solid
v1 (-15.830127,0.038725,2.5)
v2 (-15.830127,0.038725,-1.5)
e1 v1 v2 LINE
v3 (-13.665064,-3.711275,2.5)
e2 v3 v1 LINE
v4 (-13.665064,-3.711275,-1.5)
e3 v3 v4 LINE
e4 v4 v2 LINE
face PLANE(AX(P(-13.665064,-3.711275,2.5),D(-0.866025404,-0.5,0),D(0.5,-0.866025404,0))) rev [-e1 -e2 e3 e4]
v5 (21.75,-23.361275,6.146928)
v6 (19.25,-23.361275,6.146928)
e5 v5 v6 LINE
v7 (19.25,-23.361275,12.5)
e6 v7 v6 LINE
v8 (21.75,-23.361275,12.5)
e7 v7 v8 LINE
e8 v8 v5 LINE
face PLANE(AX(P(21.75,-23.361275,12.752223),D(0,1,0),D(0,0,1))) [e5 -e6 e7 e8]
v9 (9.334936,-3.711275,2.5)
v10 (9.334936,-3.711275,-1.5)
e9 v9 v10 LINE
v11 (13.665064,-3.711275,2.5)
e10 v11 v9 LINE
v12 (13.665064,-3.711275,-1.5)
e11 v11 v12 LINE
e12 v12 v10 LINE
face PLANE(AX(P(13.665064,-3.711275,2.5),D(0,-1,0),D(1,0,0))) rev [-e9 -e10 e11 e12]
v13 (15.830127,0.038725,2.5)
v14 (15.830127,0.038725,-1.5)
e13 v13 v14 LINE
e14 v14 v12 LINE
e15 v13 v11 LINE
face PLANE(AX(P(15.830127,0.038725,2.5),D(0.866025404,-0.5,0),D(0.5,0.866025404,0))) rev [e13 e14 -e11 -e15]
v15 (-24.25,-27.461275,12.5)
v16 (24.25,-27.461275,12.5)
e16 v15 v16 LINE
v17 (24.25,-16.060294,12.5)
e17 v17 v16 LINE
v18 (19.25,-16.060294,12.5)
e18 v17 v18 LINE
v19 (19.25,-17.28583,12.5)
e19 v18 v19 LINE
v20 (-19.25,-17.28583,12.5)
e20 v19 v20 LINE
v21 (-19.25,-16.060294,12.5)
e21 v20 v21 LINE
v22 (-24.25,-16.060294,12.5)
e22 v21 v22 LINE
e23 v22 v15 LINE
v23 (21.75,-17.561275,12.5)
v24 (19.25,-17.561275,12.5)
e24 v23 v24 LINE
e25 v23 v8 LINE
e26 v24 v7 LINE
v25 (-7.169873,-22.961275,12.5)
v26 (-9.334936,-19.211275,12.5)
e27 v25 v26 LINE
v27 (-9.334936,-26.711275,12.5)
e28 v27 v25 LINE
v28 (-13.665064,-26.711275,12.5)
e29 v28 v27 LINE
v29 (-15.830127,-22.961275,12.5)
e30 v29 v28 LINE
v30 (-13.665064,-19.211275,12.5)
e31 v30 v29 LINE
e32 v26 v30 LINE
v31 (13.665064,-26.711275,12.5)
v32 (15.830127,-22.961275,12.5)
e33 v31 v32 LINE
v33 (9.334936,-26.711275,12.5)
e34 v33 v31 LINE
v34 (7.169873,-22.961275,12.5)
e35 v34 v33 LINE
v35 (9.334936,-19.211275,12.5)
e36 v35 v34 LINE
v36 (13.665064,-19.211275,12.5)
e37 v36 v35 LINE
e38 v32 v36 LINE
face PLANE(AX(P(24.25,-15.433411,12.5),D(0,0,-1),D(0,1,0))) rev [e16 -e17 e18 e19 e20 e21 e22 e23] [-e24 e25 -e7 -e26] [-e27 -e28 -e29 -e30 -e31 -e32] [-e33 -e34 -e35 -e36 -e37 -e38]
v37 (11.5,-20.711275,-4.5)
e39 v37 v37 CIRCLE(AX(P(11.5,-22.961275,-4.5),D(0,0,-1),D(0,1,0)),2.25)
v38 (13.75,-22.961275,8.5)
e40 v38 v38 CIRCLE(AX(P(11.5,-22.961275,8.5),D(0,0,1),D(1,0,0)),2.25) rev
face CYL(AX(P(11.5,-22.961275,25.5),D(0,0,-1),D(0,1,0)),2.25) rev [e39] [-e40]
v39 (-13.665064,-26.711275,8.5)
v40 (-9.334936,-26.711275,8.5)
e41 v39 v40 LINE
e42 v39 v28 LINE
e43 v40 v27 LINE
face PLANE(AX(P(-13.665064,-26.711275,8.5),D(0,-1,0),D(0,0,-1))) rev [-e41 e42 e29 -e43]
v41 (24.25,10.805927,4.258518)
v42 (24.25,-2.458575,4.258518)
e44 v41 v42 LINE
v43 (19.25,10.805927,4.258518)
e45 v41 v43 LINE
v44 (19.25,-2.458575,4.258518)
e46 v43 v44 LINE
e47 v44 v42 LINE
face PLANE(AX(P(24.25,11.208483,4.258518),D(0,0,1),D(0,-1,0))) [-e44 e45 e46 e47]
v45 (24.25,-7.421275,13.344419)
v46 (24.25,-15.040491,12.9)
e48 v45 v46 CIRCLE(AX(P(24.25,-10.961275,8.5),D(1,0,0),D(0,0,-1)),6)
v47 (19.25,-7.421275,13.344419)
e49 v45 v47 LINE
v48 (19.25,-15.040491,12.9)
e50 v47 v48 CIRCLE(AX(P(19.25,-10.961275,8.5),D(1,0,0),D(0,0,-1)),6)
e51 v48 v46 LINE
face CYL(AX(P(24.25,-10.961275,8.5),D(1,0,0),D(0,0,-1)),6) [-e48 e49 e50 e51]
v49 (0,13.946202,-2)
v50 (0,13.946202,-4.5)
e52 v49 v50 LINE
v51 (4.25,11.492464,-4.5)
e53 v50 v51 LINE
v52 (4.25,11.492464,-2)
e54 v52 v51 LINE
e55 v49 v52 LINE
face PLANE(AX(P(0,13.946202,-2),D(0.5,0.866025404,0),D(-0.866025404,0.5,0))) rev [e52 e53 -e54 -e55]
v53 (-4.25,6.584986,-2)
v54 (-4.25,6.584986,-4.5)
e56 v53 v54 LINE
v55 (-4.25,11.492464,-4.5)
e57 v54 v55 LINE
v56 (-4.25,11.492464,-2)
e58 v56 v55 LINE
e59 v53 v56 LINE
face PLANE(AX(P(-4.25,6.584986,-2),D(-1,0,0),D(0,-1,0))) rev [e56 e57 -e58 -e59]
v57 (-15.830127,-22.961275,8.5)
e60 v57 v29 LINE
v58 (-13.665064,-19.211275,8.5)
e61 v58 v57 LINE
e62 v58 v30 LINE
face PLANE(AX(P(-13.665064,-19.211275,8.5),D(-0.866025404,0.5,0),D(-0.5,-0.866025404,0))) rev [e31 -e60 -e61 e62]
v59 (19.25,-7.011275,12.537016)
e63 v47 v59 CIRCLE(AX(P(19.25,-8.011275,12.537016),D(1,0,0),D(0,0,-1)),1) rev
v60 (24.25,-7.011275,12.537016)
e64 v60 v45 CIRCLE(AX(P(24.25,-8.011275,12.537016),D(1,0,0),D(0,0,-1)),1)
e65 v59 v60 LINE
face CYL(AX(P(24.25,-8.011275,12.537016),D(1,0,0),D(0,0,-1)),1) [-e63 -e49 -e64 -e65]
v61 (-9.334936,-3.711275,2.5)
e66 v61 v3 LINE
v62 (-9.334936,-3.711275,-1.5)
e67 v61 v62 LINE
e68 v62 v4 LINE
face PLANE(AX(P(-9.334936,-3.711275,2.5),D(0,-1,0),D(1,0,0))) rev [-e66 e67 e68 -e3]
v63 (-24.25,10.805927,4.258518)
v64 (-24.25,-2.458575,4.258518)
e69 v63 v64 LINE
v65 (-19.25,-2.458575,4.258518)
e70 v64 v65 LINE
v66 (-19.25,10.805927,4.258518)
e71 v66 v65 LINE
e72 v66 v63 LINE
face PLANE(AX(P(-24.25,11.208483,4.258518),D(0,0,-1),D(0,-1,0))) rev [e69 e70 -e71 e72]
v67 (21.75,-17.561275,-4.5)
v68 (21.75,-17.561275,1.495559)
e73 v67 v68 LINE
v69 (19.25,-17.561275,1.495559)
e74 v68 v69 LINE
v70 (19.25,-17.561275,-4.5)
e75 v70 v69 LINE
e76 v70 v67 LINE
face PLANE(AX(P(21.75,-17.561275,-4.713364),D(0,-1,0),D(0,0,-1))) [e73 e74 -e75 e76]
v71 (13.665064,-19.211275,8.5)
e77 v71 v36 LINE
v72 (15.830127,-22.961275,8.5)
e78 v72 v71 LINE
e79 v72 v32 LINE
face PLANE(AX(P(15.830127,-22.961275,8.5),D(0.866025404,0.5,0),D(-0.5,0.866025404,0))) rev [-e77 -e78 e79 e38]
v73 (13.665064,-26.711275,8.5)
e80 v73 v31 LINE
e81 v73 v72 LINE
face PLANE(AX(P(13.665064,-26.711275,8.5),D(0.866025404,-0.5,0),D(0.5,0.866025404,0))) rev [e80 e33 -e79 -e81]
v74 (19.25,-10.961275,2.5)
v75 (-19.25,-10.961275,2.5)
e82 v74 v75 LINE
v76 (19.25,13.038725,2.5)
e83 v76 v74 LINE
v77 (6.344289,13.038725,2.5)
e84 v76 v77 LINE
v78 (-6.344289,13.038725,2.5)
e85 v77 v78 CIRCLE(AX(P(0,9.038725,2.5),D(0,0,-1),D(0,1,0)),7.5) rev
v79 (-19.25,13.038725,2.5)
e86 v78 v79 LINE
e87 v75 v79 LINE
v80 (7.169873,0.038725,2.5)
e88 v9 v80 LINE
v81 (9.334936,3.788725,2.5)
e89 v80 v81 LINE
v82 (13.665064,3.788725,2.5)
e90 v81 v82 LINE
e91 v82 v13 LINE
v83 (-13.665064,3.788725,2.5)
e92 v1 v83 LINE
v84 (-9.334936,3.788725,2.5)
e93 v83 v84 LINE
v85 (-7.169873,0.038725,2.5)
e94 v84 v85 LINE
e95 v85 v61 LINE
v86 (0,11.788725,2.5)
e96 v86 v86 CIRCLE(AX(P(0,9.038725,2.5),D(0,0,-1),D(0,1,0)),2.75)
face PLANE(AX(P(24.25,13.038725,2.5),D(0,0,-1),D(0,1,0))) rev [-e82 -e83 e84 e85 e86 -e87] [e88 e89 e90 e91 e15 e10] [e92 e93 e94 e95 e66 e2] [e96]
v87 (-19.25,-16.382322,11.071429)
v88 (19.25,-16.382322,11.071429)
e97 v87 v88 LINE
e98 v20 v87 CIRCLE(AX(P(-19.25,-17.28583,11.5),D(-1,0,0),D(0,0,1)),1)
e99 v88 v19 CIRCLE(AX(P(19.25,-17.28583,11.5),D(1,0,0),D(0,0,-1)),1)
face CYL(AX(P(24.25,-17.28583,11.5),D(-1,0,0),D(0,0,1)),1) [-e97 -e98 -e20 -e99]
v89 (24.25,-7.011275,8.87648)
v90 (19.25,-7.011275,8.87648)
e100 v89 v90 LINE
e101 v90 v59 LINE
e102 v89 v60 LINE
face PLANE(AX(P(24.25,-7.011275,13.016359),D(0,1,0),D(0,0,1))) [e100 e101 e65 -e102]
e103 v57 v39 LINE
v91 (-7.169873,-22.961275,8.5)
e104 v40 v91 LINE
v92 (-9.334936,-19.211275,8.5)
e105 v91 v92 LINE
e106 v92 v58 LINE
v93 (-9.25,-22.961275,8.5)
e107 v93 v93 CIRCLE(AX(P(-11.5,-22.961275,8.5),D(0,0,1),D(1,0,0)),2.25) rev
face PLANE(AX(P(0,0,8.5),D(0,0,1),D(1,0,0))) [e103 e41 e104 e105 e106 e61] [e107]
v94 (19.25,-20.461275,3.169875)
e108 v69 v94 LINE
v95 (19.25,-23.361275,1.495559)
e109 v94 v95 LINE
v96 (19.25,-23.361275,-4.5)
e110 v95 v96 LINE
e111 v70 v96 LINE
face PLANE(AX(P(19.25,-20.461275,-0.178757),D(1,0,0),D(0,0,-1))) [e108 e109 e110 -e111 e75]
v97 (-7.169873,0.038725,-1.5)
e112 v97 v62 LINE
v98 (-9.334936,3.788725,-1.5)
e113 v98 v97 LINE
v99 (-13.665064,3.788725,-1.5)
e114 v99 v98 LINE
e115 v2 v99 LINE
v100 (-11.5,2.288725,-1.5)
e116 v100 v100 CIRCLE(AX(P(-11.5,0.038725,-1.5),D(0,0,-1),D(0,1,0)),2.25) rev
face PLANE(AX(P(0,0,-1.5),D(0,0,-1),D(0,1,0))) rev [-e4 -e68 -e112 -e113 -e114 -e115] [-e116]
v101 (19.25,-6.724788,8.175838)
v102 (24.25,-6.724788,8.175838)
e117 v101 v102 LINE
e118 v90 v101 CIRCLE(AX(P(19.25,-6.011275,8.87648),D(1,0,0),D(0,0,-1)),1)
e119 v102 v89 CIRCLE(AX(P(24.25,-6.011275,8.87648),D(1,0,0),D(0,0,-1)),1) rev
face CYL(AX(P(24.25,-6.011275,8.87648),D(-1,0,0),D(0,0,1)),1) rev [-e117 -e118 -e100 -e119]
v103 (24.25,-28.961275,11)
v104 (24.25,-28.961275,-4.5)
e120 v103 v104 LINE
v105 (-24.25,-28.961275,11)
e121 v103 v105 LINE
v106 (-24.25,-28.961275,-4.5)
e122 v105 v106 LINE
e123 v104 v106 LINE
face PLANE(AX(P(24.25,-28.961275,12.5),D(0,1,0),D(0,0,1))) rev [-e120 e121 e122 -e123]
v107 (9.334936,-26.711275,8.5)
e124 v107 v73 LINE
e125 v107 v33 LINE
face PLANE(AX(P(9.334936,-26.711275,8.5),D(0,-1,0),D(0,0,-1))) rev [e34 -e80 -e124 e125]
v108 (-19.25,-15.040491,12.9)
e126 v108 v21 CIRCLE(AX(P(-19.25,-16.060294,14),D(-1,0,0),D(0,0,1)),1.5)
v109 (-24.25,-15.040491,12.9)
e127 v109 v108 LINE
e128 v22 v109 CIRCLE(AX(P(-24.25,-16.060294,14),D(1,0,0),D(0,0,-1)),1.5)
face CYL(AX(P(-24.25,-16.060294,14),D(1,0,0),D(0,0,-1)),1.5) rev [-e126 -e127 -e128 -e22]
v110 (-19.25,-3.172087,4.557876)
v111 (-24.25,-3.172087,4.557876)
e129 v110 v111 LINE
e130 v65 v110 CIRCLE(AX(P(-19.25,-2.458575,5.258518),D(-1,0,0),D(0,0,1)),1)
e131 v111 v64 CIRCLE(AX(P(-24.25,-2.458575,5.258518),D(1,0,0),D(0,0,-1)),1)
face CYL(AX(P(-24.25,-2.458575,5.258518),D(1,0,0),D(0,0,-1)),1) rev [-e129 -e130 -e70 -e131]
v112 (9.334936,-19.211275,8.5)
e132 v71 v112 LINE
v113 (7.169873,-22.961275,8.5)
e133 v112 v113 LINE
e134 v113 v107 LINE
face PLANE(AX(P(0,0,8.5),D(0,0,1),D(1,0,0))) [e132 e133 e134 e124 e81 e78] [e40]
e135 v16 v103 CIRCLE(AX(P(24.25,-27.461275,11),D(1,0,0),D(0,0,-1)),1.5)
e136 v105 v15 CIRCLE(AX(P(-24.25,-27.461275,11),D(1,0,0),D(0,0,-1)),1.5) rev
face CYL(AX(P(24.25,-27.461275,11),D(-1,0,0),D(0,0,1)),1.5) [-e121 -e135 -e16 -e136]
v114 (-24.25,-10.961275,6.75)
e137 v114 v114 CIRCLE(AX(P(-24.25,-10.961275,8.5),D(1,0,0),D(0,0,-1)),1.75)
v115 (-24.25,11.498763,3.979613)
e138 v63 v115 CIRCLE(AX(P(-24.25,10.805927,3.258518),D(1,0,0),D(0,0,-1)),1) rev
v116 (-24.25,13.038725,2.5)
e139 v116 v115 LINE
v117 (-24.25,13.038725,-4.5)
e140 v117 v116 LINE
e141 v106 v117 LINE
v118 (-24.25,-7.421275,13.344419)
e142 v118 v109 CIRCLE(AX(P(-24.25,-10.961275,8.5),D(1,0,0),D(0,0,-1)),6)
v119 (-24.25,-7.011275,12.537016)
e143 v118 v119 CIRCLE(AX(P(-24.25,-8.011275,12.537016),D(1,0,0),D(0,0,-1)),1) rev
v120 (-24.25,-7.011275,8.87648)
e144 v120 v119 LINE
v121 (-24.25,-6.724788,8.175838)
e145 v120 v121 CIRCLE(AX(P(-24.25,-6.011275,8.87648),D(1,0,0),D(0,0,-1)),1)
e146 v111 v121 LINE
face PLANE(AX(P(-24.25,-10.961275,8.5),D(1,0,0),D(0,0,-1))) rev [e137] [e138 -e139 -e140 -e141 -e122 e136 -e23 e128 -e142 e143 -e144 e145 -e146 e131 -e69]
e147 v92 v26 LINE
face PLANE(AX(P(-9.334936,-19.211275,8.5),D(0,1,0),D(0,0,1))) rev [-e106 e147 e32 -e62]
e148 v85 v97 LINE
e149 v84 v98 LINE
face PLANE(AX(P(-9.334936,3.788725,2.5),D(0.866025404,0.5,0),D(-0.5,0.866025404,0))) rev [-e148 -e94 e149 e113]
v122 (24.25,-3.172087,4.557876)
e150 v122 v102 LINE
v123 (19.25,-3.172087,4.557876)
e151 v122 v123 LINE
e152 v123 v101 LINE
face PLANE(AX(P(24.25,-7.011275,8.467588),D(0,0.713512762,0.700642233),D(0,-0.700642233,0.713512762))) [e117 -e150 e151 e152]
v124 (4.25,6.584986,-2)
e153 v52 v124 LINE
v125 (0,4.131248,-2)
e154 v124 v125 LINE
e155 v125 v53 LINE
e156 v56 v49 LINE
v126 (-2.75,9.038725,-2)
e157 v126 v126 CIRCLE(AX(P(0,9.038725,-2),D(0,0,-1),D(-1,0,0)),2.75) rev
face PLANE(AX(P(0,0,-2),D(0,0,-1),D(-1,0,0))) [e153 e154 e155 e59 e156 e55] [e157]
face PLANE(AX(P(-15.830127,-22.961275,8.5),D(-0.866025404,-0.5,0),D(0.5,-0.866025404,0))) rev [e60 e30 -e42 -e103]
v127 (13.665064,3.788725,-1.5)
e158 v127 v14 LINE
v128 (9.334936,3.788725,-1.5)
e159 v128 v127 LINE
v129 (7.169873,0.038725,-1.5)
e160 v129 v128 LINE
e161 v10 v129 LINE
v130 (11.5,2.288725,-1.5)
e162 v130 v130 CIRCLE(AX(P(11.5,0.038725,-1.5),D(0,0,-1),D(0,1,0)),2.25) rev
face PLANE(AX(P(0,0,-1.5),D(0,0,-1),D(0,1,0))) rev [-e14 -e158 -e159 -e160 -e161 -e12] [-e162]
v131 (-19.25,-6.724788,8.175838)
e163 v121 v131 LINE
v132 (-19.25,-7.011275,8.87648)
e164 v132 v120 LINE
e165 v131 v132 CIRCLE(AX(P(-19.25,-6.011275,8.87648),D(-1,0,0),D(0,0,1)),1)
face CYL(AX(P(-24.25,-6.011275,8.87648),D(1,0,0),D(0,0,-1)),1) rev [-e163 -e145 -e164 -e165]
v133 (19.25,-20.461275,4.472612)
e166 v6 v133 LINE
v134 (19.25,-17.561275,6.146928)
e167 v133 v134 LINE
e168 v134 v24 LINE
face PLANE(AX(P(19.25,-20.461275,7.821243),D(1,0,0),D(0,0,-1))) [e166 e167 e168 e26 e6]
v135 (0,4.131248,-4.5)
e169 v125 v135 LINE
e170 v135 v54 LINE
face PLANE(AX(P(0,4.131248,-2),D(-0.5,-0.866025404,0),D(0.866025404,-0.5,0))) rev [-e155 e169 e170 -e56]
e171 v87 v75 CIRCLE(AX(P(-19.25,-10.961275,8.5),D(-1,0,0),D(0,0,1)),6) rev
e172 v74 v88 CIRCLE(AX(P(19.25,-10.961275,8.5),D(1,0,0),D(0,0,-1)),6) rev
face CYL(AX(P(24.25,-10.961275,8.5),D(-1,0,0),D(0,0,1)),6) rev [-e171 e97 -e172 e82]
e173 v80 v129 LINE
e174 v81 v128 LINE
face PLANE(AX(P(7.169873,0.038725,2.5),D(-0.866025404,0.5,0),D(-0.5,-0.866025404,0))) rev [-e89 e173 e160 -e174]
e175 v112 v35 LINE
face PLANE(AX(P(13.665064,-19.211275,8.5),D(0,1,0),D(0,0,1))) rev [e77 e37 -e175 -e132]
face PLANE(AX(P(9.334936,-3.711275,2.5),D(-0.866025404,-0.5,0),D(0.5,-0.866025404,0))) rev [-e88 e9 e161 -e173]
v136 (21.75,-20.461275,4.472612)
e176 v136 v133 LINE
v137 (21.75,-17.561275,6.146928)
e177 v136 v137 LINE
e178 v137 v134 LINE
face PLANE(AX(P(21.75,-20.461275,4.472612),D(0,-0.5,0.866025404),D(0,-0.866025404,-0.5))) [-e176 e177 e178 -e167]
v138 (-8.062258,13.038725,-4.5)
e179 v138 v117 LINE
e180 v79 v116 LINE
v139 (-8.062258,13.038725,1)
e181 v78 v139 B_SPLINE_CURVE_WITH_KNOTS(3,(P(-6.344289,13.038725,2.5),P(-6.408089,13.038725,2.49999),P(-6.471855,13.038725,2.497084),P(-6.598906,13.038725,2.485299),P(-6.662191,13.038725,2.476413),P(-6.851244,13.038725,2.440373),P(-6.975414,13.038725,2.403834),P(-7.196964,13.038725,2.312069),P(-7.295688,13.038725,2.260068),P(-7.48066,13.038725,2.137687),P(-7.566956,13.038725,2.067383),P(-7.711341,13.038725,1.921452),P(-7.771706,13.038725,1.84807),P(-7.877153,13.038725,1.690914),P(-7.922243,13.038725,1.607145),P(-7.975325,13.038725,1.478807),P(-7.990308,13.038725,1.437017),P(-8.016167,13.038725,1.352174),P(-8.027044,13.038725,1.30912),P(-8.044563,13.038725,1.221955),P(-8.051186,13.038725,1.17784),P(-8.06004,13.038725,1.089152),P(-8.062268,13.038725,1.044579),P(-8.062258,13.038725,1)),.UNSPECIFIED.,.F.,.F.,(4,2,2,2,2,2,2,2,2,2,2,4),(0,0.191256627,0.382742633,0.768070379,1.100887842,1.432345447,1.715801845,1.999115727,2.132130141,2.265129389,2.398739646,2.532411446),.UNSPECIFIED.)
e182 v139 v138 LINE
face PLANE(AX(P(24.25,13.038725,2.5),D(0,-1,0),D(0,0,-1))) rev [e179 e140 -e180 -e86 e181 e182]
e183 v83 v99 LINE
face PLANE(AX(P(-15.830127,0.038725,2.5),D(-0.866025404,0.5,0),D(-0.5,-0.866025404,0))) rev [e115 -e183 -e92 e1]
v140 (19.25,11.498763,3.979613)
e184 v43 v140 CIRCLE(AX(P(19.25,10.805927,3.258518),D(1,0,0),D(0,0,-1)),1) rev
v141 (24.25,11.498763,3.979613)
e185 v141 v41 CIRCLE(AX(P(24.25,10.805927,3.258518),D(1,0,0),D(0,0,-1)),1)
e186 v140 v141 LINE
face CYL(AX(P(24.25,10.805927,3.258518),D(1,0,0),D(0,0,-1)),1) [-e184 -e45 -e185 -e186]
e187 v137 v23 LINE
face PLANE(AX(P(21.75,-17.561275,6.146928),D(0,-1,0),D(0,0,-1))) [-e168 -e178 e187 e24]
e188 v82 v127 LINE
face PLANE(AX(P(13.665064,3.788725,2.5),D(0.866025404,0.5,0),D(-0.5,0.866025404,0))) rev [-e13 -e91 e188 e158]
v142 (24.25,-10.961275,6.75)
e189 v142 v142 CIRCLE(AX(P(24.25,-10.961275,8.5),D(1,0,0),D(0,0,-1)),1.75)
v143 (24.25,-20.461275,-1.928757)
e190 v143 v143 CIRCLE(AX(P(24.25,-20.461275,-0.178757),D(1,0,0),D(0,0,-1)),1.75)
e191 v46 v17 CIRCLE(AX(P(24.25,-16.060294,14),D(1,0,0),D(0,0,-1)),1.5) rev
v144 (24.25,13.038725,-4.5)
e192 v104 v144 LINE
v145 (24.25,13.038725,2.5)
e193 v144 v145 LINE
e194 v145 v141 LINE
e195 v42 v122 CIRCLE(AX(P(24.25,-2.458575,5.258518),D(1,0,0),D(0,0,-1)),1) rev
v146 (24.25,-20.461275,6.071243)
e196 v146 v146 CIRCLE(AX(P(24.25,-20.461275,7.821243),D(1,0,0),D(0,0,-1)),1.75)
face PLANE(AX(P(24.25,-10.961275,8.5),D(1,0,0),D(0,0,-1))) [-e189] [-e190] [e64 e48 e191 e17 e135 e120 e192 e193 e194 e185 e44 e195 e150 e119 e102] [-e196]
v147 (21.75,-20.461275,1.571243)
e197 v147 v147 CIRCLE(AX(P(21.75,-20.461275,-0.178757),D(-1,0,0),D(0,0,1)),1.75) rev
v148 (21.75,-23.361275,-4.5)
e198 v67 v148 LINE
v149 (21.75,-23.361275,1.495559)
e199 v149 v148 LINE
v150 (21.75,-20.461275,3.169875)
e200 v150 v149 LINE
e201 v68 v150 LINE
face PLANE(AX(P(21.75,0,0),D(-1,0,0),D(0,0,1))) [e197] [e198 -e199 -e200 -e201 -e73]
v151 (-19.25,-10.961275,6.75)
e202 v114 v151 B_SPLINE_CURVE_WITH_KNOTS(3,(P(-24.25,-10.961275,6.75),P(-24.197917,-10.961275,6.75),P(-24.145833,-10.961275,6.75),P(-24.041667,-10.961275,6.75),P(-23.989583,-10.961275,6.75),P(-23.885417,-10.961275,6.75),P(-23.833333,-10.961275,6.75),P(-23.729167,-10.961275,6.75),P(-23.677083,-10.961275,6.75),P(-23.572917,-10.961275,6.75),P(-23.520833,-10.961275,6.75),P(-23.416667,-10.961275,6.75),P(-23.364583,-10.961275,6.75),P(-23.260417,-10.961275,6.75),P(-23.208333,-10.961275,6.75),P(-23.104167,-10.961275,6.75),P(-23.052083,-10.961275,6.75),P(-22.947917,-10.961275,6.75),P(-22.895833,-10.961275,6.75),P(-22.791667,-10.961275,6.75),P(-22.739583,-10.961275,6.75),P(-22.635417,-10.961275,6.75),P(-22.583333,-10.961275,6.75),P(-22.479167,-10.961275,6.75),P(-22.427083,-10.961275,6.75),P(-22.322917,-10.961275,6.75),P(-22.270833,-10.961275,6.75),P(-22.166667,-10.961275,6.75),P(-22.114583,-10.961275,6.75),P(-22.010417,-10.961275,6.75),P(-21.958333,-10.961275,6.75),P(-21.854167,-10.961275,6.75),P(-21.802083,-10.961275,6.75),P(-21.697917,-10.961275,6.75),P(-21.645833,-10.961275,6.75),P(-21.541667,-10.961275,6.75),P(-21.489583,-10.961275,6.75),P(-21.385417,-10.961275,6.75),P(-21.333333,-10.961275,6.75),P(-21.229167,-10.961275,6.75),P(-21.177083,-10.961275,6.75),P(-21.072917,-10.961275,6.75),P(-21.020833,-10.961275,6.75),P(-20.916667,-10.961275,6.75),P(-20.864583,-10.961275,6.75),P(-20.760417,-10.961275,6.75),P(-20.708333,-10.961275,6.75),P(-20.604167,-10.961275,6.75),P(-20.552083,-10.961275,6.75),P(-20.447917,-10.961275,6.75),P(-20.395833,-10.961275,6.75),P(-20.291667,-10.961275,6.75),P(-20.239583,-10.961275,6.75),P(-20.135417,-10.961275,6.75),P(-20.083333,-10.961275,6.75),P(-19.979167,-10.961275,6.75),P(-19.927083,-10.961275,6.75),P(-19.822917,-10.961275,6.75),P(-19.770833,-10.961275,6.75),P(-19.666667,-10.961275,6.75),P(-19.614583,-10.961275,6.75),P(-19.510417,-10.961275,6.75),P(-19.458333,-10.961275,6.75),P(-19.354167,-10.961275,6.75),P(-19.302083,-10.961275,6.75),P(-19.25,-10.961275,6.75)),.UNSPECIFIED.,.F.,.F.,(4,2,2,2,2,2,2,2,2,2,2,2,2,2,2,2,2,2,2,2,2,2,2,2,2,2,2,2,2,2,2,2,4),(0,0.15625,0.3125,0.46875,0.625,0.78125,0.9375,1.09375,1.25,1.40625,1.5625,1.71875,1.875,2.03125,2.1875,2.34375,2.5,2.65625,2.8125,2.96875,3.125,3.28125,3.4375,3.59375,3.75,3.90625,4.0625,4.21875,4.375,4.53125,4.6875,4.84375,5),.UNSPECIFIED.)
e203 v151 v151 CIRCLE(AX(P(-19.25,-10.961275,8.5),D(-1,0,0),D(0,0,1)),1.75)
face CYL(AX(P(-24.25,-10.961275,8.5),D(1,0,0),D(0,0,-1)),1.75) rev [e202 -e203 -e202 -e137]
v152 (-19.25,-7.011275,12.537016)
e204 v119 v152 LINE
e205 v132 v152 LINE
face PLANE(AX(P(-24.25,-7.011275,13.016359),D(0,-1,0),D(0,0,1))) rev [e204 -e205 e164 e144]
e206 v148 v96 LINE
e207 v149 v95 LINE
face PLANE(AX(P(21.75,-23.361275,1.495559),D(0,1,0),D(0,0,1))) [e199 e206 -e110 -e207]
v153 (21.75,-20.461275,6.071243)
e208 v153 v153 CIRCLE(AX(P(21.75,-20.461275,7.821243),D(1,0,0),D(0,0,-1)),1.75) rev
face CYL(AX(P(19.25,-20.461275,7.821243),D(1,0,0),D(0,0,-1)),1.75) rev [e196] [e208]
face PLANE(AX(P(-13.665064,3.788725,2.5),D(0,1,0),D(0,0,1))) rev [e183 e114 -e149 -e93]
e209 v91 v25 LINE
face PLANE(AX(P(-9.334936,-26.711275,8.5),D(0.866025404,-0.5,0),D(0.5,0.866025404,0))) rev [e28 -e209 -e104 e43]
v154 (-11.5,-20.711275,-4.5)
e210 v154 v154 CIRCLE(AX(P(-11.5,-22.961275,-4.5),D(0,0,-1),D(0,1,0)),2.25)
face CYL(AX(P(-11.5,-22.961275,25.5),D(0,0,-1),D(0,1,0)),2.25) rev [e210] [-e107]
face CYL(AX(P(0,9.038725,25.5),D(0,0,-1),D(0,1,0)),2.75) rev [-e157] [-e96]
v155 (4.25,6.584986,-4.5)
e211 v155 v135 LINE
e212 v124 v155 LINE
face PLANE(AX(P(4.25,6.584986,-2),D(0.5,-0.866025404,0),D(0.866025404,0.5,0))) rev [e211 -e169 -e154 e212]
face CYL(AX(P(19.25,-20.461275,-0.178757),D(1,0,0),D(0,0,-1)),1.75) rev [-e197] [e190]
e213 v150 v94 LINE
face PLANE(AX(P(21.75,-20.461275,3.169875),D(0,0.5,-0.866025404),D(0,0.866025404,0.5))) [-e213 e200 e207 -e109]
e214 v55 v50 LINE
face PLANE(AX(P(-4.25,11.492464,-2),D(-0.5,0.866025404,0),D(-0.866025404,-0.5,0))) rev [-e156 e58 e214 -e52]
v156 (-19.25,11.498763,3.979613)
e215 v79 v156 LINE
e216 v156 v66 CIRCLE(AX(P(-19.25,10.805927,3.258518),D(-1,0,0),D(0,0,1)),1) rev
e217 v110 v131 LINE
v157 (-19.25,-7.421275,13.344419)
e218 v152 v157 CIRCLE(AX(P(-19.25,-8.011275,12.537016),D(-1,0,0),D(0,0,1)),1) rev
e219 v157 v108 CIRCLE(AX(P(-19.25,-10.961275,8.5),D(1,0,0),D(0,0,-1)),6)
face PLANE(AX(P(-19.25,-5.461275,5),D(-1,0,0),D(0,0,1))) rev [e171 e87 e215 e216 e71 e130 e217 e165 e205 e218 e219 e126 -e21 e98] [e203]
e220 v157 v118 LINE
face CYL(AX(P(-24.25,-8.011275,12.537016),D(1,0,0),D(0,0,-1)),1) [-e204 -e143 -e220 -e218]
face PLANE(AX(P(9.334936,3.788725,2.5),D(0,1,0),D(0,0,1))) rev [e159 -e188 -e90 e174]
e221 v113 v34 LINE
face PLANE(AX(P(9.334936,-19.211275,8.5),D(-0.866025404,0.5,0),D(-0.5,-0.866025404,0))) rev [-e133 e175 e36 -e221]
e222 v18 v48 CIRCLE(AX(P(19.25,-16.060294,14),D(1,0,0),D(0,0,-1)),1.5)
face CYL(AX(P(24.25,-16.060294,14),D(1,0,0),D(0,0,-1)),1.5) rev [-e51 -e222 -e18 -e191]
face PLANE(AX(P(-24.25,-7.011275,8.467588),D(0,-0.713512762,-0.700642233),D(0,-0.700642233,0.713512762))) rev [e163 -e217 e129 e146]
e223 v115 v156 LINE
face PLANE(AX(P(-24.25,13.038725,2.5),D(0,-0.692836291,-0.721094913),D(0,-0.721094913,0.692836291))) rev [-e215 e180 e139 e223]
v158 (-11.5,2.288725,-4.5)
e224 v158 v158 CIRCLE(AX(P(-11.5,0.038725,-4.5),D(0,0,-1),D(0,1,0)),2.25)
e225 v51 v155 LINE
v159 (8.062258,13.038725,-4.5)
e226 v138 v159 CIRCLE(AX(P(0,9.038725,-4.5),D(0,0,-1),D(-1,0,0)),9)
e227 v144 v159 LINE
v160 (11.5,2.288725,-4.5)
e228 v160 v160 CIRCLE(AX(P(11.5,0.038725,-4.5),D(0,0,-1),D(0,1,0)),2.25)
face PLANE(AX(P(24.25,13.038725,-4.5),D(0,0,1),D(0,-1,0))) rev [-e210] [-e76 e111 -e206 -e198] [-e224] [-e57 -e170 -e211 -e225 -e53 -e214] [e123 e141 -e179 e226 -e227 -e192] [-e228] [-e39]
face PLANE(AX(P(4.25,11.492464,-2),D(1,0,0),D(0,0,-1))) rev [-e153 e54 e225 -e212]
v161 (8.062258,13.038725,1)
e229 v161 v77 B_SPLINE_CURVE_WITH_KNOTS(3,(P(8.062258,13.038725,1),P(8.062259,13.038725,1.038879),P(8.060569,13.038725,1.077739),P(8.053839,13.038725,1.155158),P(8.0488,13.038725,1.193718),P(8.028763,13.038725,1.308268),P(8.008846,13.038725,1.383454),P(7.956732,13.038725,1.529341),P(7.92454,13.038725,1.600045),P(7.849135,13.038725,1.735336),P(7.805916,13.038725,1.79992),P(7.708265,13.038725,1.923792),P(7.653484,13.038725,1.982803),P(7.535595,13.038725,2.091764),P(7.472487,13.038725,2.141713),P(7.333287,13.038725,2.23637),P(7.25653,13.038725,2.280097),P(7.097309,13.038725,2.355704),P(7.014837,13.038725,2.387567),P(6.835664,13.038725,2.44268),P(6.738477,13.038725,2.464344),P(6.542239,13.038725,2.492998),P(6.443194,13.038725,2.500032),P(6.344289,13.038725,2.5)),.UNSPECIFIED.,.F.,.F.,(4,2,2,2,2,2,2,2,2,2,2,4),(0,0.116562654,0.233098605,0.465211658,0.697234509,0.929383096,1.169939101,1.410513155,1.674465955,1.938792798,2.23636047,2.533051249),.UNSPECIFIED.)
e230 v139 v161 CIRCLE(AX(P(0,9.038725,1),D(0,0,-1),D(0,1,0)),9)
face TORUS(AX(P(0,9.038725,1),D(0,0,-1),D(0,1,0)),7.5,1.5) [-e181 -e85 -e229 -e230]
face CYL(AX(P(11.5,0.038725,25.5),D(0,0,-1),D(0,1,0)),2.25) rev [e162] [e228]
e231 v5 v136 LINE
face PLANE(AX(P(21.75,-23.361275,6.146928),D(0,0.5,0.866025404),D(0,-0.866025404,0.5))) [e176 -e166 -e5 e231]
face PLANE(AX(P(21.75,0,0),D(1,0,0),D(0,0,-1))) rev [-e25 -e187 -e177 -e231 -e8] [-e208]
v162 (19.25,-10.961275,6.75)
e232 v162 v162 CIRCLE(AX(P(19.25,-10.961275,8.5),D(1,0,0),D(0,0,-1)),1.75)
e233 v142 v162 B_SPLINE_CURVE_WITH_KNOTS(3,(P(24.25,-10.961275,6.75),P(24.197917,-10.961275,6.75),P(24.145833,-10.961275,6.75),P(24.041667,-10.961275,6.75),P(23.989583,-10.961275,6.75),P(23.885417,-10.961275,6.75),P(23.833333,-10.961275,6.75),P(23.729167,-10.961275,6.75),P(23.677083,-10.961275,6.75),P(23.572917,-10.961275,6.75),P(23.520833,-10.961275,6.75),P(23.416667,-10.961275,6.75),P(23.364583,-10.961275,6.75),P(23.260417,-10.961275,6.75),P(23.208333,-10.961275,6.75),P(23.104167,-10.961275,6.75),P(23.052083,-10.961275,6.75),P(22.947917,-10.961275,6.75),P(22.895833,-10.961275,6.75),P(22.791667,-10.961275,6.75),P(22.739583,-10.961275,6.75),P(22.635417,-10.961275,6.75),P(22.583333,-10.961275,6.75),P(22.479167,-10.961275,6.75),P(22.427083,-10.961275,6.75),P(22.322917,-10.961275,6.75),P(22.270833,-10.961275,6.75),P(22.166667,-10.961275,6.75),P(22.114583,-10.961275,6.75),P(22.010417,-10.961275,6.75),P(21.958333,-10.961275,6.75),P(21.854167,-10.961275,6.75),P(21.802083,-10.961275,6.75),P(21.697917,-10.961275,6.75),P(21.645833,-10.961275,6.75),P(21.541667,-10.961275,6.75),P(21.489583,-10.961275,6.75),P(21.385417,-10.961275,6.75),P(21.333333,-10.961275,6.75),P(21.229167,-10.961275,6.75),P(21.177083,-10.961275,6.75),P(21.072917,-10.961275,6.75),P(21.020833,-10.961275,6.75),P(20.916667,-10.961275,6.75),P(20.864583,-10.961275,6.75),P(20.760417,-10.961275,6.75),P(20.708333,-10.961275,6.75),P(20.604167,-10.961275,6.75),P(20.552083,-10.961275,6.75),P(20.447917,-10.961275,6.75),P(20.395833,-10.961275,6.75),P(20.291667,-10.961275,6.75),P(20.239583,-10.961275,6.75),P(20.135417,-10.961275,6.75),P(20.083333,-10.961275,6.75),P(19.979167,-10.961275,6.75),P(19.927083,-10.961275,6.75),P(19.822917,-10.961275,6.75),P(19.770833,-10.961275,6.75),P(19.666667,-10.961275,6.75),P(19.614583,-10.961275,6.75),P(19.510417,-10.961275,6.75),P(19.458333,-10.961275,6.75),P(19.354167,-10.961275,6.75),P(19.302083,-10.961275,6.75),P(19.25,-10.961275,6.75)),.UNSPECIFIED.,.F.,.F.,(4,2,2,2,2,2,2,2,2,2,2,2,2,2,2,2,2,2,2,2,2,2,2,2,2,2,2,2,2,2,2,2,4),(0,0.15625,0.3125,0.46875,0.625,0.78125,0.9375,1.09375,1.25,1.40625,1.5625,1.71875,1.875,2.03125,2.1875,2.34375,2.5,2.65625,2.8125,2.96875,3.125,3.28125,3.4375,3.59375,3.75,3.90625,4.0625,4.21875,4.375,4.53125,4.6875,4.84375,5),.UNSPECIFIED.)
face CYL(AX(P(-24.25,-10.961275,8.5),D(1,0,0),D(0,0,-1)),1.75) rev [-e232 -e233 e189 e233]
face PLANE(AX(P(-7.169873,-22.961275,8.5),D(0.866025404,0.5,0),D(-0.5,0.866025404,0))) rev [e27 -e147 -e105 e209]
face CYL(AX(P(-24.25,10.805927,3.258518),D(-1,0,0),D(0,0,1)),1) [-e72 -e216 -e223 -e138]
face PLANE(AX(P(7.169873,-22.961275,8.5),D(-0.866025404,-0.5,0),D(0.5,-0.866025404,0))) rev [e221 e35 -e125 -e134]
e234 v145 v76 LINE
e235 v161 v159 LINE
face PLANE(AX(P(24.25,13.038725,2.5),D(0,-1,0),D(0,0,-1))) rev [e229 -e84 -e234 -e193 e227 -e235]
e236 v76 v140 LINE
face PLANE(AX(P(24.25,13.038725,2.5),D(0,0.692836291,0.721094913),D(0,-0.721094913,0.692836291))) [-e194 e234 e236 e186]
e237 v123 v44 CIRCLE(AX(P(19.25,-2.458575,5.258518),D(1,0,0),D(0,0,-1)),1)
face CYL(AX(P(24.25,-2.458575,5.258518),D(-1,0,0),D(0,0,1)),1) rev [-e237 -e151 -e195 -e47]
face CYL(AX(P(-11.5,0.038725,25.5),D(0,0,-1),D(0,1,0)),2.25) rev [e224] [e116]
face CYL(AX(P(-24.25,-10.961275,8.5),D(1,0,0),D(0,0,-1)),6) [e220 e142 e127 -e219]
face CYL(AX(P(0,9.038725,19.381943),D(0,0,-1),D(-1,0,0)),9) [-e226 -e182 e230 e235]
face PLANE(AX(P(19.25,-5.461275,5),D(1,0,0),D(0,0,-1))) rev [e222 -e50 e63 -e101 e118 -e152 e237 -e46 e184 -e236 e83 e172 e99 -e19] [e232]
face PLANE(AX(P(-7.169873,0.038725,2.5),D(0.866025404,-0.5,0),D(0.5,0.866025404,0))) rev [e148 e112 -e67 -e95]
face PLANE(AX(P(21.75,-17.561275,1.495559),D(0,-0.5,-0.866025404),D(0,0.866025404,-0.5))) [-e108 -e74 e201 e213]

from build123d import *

# Parameters (mm, degrees)
BOSS_EXTRUDE1_DEPTH = 24.25
BOSS_EXTRUDE2_DEPTH = 7
SKETCH2_R           = 2.25
SKETCH2_R_2         = 2.75
CUT_EXTRUDE1_DEPTH  = 30
RIB2_START          = -5
RIB2_DEPTH          = 5
SKETCH11_R          = 1.75
CUT_EXTRUDE3_DEPTH  = 59.320283327
CUT_EXTRUDE5_DEPTH  = 4
CUT_EXTRUDE6_DEPTH  = 2.5
FILLET1_R           = 1
CUT_EXTRUDE7_DEPTH  = 4
FILLET2_R           = 1.5
SKETCH16_R          = 1.75
CUT_EXTRUDE8_DEPTH  = 5
CUT_EXTRUDE11_DEPTH = 2.5


# Read off the part's stored shape, not the designer's step: Rib2
with BuildPart() as part:
    # Sketch1 → Boss-Extrude1 (new, symmetric)
    with BuildSketch(Plane(origin=(0, 0, 0), x_dir=(0, 0, -1), z_dir=(1, 0, 0))):
        with BuildLine():
            Line((-2.5, 13.03872504), (4.5, 13.03872504))
            Line((4.5, 13.03872504), (4.5, -28.96127496))
            Line((4.5, -28.96127496), (-12.5, -28.96127496))
            Line((-12.5, -28.96127496), (-12.5, -15.433410915))
            ThreePointArc((-12.5, -15.433410915), (-6.050510257, -16.438500535), (-2.5, -10.96127496))
            Line((-2.5, -10.96127496), (-2.5, 13.03872504))
        make_face()
    extrude(amount=BOSS_EXTRUDE1_DEPTH, both=True)

    # Sketch8 → Boss-Extrude2 (add)
    with BuildSketch(Plane(origin=(0, 0, -4.5), x_dir=(-1, 0, 0), z_dir=(0, 0, -1))):
        with BuildLine():
            Line((-8.062257748, 13.03872504), (8.062257748, 13.03872504))
            ThreePointArc((8.062257748, 13.03872504), (0, 18.03872504), (-8.062257748, 13.03872504))
        make_face()
    extrude(amount=-BOSS_EXTRUDE2_DEPTH)

    # Sketch2 → Cut-Extrude1 (cut)
    with BuildSketch(Plane(origin=(0, 0, -4.5), x_dir=(-1, 0, 0), z_dir=(0, 0, -1))):
        with Locations(Location((11.5, 0.03872504, 0), (0, 0, 90))):
            Circle(SKETCH2_R)
        with Locations(Location((-11.5, 0.03872504, 0), (0, 0, 90))):
            Circle(SKETCH2_R)
        with Locations(Location((-11.5, -22.96127496, 0), (0, 0, 90))):
            Circle(SKETCH2_R)
        with Locations(Location((11.5, -22.96127496, 0), (0, 0, 90))):
            Circle(SKETCH2_R)
        with Locations(Location((0, 9.03872504, 0), (0, 0, 90))):
            Circle(SKETCH2_R_2)
    extrude(amount=-CUT_EXTRUDE1_DEPTH, mode=Mode.SUBTRACT)

    # Rib2 outline → Rib2 (add)
    with BuildSketch(Plane(origin=(24.25, 0, 0), x_dir=(0, 0, -1), z_dir=(1, 0, 0)).offset(RIB2_START)):
        with BuildLine():
            Line((-2.5, 13.03872504), (-4.258517887, 11.208482718))
            Line((-4.258517887, 11.208482718), (-4.258517887, -2.878129508))
            Line((-4.258517887, -2.878129508), (-8.467587637, -7.01127496))
            Line((-8.467587637, -7.01127496), (-13.016359153, -7.01127496))
            ThreePointArc((-13.016359153, -7.01127496), (-14.488755031, -11.328444107), (-12.5, -15.433410915))
            ThreePointArc((-12.5, -15.433410915), (-6.050510257, -16.438500535), (-2.5, -10.96127496))
            Line((-2.5, -10.96127496), (-2.5, 13.03872504))
        make_face()
    rib2 = extrude(amount=RIB2_DEPTH)

    # Mirror1: Rib2 across plane
    add(rib2.mirror(Plane(origin=(0, 0, 0), x_dir=(0, 0, 1), z_dir=(1, 0, 0))))

    # Sketch11 → Cut-Extrude3 (cut, through all)
    with BuildSketch(Plane(origin=(24.25, 0, 0), x_dir=(0, 0, -1), z_dir=(1, 0, 0))):
        with Locations((-8.5, -10.96127496)):
            Circle(SKETCH11_R)
    extrude(amount=-CUT_EXTRUDE3_DEPTH, mode=Mode.SUBTRACT)

    # Sketch12 → Cut-Extrude5 (cut)
    with BuildSketch(Plane(origin=(0, 0, -1.5), x_dir=(-1, 0, 0), z_dir=(0, 0, -1))):
        Polygon((15.830127019, 0.03872504), (13.665063509, 3.78872504), (9.334936491, 3.78872504), (7.169872981, 0.03872504), (9.334936491, -3.71127496), (13.665063509, -3.71127496), align=None)
        Polygon((-7.169872981, 0.03872504), (-9.334936491, 3.78872504), (-13.665063509, 3.78872504), (-15.830127019, 0.03872504), (-13.665063509, -3.71127496), (-9.334936491, -3.71127496), align=None)
    extrude(amount=-CUT_EXTRUDE5_DEPTH, mode=Mode.SUBTRACT)

    # Sketch14 → Cut-Extrude6 (cut)
    with BuildSketch(Plane(origin=(0, 0, -4.5), x_dir=(-1, 0, 0), z_dir=(0, 0, -1))):
        Polygon((0, 13.946202328), (-4.25, 11.492463684), (-4.25, 6.584986396), (0, 4.131247752), (4.25, 6.584986396), (4.25, 11.492463684), align=None)
    extrude(amount=-CUT_EXTRUDE6_DEPTH, mode=Mode.SUBTRACT)

    # Fillet1
    fillet1_edges = [part.edges().sort_by_distance(p)[0] for p in [
        (0, -15.433410915, 12.5),
        (21.75, -2.878129508, 4.258517887),
        (21.75, -7.01127496, 8.467587637),
        (21.75, -7.01127496, 13.016359153),
        (21.75, 11.208482718, 4.258517887),
        (-21.75, -7.01127496, 13.016359153),
        (-21.75, -7.01127496, 8.467587637),
        (-21.75, -2.878129508, 4.258517887),
        (-21.75, 11.208482718, 4.258517887),
    ]]
    fillet(fillet1_edges, radius=FILLET1_R)

    # Sketch15 → Cut-Extrude7 (cut)
    with BuildSketch(Plane.XY.offset(12.5)):
        Polygon((-7.169872981, -22.96127496), (-9.334936491, -19.21127496), (-13.665063509, -19.21127496), (-15.830127019, -22.96127496), (-13.665063509, -26.71127496), (-9.334936491, -26.71127496), align=None)
        Polygon((15.830127019, -22.96127496), (13.665063509, -19.21127496), (9.334936491, -19.21127496), (7.169872981, -22.96127496), (9.334936491, -26.71127496), (13.665063509, -26.71127496), align=None)
    extrude(amount=-CUT_EXTRUDE7_DEPTH, mode=Mode.SUBTRACT)

    # Fillet2
    fillet2_edges = [part.edges().sort_by_distance(p)[0] for p in [
        (0, -28.96127496, 12.5),
        (21.75, -15.433410915, 12.5),
        (0, 18.03872504, 2.5),
        (-21.75, -15.433410915, 12.5),
    ]]
    fillet(fillet2_edges, radius=FILLET2_R)

    # Sketch16 → Cut-Extrude8 (cut)
    with BuildSketch(Plane(origin=(24.25, 0, 0), x_dir=(0, 0, -1), z_dir=(1, 0, 0))):
        with Locations((0.178756589, -20.46127496)):
            Circle(SKETCH16_R)
        with Locations((-7.821243411, -20.46127496)):
            Circle(SKETCH16_R)
    extrude(amount=-CUT_EXTRUDE8_DEPTH, mode=Mode.SUBTRACT)

    # Sketch18 → Cut-Extrude11 (cut)
    with BuildSketch(Plane(origin=(19.25, 0, 0), x_dir=(0, 0, -1), z_dir=(1, 0, 0))):
        Polygon((-6.146927631, -17.56127496), (-12.752223074, -17.56127496), (-12.752223074, -23.36127496), (-6.146927631, -23.36127496), (-4.47261185, -20.46127496), align=None)
        Polygon((-1.495559192, -23.36127496), (4.713363878, -23.36127496), (4.713363878, -17.56127496), (-1.495559192, -17.56127496), (-3.169874973, -20.46127496), align=None)
    extrude(amount=CUT_EXTRUDE11_DEPTH, mode=Mode.SUBTRACT)


solid = part.part
